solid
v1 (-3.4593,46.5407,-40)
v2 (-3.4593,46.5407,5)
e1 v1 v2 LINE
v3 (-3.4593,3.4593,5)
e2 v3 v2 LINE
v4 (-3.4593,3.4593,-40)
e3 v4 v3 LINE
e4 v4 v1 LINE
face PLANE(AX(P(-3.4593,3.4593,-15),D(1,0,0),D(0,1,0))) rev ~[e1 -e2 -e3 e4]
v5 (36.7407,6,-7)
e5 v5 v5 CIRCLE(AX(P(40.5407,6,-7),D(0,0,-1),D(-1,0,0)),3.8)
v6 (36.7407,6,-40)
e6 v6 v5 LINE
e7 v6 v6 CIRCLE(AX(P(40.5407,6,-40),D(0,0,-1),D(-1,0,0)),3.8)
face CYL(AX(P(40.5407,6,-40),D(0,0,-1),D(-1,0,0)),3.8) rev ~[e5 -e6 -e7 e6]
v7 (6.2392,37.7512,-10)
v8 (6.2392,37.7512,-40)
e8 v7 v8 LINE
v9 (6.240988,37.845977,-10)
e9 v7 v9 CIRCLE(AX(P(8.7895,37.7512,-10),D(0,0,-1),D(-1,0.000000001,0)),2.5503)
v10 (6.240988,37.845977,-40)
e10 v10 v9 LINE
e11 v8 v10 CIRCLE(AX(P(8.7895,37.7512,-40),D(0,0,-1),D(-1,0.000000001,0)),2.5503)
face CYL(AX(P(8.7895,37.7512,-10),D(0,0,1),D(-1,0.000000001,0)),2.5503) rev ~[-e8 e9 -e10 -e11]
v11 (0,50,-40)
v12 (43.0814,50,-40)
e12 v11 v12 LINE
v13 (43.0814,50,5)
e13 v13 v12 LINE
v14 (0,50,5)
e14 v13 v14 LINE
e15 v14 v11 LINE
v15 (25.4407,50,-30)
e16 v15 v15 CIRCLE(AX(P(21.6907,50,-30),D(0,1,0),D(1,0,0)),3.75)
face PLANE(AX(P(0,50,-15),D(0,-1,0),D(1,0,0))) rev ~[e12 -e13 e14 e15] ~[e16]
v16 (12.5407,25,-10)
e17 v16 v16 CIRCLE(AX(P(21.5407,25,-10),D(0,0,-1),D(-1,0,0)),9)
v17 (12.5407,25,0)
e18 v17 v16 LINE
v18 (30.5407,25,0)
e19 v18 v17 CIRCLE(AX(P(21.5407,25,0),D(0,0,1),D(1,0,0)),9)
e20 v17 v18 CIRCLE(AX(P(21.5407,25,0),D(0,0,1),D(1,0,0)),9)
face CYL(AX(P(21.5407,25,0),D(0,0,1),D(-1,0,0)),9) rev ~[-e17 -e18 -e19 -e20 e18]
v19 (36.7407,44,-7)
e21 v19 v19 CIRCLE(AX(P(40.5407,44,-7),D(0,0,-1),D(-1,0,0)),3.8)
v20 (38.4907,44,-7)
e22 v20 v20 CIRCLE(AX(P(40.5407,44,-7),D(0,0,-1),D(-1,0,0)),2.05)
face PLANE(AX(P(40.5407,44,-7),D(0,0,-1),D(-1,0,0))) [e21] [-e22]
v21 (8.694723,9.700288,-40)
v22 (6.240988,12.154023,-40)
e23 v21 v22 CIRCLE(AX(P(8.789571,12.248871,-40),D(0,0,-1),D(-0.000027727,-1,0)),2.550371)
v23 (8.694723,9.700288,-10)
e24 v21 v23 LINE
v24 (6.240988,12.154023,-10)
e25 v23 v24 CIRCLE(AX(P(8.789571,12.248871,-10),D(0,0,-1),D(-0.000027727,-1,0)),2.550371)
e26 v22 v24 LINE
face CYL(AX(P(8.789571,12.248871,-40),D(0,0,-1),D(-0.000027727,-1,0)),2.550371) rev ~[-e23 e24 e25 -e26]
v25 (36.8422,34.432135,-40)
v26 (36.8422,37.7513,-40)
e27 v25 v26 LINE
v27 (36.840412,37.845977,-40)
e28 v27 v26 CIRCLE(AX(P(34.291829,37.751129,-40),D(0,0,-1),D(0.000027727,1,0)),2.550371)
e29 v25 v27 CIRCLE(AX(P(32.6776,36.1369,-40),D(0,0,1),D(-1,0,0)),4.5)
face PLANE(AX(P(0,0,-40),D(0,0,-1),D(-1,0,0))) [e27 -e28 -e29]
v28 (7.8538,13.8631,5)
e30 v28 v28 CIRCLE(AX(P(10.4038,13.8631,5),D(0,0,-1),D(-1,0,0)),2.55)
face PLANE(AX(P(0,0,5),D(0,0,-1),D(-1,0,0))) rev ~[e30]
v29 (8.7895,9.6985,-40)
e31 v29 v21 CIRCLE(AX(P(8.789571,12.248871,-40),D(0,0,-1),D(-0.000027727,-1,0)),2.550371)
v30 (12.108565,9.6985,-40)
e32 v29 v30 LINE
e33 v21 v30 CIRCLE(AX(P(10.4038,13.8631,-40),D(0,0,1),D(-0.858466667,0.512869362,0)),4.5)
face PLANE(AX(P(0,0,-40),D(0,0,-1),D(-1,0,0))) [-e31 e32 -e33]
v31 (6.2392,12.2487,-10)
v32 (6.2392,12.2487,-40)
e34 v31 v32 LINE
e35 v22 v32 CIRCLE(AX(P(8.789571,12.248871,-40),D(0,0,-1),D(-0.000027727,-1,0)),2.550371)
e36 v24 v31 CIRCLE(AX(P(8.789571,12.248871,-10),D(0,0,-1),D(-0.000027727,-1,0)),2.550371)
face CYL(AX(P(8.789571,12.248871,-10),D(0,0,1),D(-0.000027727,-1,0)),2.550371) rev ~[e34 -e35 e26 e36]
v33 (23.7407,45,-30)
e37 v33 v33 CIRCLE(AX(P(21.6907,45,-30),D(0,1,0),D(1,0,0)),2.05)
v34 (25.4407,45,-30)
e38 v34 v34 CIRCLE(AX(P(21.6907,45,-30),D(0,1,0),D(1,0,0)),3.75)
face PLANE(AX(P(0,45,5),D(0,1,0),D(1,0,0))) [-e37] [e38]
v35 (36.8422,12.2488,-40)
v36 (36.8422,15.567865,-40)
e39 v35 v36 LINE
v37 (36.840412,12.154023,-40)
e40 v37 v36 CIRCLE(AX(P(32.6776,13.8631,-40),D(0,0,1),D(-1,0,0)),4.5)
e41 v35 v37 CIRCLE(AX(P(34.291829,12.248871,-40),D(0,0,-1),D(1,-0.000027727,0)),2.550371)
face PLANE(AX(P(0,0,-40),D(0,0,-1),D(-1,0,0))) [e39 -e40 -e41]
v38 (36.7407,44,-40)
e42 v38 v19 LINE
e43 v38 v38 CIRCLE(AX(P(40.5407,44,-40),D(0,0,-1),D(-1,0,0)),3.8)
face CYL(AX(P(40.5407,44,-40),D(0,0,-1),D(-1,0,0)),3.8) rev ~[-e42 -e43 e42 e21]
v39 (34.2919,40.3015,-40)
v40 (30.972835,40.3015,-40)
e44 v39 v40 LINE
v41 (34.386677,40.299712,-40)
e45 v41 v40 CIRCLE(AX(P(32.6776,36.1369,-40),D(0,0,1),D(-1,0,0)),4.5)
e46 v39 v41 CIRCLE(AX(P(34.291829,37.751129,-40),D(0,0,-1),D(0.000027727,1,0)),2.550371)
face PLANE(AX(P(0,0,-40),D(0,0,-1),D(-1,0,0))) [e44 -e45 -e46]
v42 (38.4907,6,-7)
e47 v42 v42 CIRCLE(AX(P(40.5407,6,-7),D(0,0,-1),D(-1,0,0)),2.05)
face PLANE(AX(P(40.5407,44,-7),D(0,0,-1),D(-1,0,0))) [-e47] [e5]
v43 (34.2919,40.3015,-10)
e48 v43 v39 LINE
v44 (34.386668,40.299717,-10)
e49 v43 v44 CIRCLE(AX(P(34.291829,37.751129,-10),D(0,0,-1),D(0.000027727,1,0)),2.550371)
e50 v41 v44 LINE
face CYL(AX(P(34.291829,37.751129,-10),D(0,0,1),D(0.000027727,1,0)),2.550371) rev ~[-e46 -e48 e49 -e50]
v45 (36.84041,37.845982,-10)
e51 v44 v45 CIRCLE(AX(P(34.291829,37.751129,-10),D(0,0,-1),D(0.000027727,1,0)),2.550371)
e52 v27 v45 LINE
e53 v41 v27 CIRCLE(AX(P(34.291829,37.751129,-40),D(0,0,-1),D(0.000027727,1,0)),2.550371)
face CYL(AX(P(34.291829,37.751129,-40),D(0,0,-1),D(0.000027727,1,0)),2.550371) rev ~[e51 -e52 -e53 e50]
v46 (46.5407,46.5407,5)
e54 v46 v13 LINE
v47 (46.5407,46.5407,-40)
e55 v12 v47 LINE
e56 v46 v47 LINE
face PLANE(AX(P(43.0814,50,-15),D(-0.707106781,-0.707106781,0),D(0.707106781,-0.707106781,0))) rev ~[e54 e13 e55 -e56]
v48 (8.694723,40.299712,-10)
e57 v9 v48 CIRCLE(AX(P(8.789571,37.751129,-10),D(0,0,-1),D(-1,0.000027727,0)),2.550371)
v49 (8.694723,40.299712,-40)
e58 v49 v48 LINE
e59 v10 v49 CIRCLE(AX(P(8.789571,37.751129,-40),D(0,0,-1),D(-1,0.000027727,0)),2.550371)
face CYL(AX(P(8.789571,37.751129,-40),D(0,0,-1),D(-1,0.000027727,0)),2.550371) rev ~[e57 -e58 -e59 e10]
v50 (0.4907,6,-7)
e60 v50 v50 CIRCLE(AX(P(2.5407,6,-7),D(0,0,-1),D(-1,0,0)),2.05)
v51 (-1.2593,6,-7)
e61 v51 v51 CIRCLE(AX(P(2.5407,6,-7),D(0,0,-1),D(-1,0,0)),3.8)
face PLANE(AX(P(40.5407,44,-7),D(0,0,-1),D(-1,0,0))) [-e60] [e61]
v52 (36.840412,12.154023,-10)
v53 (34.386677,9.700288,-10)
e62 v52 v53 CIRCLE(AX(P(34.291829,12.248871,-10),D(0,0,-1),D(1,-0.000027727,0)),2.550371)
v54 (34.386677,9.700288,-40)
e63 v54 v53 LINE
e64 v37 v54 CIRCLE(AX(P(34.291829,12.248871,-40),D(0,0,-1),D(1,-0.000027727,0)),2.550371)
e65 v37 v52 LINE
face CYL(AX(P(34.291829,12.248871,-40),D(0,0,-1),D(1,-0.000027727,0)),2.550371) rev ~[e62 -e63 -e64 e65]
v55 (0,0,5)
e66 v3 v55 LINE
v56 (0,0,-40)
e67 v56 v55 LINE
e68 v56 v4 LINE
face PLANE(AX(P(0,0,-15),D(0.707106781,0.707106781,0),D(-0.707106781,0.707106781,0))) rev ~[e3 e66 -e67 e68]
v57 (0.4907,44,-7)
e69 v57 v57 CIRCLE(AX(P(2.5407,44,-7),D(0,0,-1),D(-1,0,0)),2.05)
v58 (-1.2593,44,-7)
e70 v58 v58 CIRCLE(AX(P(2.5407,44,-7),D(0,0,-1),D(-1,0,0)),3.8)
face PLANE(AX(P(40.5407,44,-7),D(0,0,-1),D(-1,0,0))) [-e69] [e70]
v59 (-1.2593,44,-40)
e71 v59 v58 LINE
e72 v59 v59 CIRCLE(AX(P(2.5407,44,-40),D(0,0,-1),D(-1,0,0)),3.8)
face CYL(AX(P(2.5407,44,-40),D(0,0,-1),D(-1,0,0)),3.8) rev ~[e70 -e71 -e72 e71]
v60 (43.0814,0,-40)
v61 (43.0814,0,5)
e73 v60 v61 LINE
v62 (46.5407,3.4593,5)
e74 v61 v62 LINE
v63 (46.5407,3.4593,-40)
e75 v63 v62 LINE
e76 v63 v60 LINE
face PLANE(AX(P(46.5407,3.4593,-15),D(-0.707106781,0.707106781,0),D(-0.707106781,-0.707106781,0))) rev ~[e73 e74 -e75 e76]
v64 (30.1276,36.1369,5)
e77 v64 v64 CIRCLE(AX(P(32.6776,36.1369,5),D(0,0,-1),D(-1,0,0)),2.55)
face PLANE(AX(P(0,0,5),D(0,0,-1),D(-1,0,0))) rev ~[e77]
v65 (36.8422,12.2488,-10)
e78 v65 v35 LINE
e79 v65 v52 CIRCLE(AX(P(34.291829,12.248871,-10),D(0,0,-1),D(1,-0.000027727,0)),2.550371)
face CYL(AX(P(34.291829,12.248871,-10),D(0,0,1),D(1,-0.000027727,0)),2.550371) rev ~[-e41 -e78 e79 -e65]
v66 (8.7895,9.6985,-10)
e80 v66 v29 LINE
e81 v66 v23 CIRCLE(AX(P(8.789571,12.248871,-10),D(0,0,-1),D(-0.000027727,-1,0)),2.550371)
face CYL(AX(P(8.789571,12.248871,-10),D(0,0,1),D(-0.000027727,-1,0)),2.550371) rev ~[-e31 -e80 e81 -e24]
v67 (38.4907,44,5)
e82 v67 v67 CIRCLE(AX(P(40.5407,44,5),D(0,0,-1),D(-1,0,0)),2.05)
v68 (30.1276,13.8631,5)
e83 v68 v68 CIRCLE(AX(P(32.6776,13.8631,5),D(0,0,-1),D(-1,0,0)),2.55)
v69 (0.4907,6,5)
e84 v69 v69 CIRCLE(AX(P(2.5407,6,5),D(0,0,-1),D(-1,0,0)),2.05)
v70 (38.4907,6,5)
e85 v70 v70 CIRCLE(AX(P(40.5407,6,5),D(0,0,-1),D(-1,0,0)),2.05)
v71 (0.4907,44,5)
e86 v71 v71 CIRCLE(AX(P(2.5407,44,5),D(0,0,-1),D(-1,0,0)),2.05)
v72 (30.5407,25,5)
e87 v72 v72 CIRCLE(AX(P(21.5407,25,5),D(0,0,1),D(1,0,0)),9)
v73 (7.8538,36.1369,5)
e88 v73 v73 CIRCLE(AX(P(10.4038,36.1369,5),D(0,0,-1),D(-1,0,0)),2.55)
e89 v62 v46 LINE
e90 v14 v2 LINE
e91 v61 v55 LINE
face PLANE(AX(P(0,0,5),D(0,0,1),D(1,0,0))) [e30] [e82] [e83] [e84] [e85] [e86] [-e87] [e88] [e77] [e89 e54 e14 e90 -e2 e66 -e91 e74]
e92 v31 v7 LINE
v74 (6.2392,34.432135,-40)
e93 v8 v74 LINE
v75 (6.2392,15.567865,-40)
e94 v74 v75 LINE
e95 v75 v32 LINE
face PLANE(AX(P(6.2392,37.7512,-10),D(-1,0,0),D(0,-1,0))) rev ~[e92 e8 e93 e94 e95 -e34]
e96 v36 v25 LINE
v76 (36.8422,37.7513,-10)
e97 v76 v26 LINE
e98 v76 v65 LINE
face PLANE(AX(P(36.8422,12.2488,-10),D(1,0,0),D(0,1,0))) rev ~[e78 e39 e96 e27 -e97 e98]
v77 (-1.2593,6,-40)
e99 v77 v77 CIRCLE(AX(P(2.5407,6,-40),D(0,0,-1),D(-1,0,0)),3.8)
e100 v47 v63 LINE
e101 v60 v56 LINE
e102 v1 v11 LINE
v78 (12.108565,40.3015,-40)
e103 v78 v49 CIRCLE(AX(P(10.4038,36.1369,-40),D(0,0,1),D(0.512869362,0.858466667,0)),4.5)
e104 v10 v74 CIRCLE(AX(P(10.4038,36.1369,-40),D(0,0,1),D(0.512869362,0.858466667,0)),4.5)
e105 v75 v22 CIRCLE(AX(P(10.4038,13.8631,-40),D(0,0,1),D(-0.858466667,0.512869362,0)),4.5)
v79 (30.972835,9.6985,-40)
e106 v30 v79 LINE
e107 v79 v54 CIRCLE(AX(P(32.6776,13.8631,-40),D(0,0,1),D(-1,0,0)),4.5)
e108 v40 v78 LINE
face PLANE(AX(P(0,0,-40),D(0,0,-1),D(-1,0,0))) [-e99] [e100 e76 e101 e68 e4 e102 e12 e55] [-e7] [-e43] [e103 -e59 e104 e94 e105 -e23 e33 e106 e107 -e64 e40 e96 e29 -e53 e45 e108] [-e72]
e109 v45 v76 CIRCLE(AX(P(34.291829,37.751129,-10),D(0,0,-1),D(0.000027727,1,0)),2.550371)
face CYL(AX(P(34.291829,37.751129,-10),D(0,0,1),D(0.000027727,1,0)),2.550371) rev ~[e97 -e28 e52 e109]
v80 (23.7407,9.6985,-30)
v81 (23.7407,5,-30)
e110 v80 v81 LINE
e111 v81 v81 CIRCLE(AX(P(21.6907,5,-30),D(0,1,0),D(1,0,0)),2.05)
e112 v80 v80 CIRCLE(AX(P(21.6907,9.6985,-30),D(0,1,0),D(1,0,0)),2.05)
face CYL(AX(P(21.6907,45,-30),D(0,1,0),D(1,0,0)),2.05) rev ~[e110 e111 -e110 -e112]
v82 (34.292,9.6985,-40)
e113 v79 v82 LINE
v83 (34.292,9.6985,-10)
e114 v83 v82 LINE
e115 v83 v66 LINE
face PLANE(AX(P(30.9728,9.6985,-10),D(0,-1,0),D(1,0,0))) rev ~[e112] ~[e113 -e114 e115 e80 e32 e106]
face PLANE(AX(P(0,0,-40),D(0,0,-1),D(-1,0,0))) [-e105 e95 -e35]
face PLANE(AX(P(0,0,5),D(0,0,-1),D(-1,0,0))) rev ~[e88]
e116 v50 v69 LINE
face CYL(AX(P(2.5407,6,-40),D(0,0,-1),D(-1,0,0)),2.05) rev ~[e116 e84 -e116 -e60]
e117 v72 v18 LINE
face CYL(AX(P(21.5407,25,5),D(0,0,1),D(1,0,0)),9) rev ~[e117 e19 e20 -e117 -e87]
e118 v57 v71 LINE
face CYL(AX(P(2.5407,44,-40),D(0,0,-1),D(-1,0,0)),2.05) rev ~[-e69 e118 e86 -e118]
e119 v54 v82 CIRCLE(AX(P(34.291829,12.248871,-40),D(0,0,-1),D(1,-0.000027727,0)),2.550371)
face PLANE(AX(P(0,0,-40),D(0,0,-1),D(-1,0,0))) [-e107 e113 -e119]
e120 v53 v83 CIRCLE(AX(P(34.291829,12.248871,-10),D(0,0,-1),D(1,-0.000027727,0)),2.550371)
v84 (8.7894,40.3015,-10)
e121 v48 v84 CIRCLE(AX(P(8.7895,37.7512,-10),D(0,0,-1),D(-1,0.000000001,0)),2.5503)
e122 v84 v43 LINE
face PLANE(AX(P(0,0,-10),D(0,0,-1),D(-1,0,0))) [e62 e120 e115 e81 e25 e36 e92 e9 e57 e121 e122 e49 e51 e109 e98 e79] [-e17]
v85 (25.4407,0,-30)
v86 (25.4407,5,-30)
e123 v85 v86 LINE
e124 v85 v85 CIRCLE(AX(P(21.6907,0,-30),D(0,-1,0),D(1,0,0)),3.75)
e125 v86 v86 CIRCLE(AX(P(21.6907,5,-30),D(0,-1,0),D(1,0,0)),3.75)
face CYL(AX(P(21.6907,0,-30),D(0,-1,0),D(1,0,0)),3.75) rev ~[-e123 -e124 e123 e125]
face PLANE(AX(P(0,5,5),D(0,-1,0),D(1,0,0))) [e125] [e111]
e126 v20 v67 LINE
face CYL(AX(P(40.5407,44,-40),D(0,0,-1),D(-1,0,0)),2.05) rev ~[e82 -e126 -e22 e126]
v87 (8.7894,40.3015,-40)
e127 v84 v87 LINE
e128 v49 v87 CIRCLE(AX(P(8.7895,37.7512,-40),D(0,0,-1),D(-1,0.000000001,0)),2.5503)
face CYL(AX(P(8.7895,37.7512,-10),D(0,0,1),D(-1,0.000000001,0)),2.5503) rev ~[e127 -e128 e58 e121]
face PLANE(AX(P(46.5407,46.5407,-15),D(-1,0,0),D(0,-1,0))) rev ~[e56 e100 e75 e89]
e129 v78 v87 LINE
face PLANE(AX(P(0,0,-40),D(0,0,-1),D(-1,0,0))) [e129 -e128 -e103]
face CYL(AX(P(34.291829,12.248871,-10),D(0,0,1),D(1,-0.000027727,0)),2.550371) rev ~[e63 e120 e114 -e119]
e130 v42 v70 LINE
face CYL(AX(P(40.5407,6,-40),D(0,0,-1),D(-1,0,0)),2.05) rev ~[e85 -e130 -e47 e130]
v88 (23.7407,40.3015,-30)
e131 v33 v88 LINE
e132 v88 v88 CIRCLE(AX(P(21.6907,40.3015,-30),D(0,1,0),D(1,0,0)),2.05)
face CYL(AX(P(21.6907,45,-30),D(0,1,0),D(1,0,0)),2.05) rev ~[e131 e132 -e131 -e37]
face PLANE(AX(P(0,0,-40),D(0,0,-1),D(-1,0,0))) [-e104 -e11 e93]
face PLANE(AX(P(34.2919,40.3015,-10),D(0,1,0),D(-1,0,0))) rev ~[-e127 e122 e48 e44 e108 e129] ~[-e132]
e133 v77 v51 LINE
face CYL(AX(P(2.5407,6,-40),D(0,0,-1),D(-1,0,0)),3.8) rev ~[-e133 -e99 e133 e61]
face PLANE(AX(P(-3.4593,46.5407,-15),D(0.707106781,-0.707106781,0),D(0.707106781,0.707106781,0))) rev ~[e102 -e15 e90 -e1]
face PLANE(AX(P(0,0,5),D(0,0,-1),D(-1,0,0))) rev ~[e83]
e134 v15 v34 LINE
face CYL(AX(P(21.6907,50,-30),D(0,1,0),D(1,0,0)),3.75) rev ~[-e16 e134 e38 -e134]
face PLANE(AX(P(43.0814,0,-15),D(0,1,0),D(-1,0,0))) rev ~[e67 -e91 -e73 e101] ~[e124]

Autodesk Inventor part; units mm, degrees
ref_plane "YZ Plane" through (0, 0, 0) normal (1, 0, 0) x (0, 1, 0)
ref_plane "XZ Plane" through (0, 0, 0) normal (0, 1, 0) x (-1, 0, 0)
ref_plane "XY Plane" through (0, 0, 0) normal (0, 0, 1) x (1, 0, 0)
sketch "Sketch11" plane through (0, 0, 0) normal (0, 0, 1) x (1, 0, 0)
  line L0 (-3.4593, 3.4593) -> (0, 0)
  line L1 (-3.4593, 3.4593) -> (-3.4593, 46.5407)
  line L2 (0, 50) -> (-3.4593, 46.5407)
  line L3 (43.0814, 50) -> (0, 50)
  line L4 (46.5407, 46.5407) -> (43.0814, 50)
  line L5 (46.5407, 3.4593) -> (46.5407, 46.5407)
  line L6 (43.0814, 0) -> (46.5407, 3.4593)
  line L7 (43.0814, 0) -> (0, 0)
extrude "Extrusion8" add sketch "Sketch11" along normal blind 5
sketch "Sketch16" plane through (0, 0, 0) normal (0, 0, -1) x (-1, 0, 0)
  line L0 (-27.0407, 40) -> (-34.0407, 40)
  line L1 (-36.5407, 37.5) -> (-36.5407, 30.5)
  arc A0 (-34.0407, 40) -> (-36.5407, 37.5) centre (-34.0407, 37.5) ccw
  line L2 (-9.0407, 40) -> (-16.0407, 40)
  arc A1 (-6.5407, 37.5) -> (-9.0407, 40) centre (-9.0407, 37.5) ccw
  line L3 (-6.5407, 30.5) -> (-6.5407, 37.5)
  line L4 (-6.5407, 12.5) -> (-6.5407, 19.5)
  arc A2 (-9.0407, 10) -> (-6.5407, 12.5) centre (-9.0407, 12.5) ccw
  line L5 (-16.0407, 10) -> (-9.0407, 10)
  line L6 (-34.0407, 10) -> (-27.0407, 10)
  arc A3 (-36.5407, 12.5) -> (-34.0407, 10) centre (-34.0407, 12.5) ccw
  line L7 (-36.5407, 19.5) -> (-36.5407, 12.5)
  line L8 (0, 50) -> (3.4593, 46.5407) projected
  line L9 (-43.0814, 0) -> (-46.5407, 3.4593) projected
  line L10 (-46.5407, 46.5407) -> (-43.0814, 50) projected
  line L11 (-43.0814, 0) -> (-43.0814, 50)
  line L12 (3.4593, 3.4593) -> (0, 0) projected
  line L13 (-6.5407, 30.5) -> (-6.5407, 19.5)
  line L14 (-16.0407, 40) -> (-27.0407, 40)
  line L15 (-36.5407, 30.5) -> (-36.5407, 19.5)
  line L16 (-27.0407, 10) -> (-16.0407, 10)
  circle A4 centre (-2.5407, 44) radius 2.5
  circle A5 centre (-40.5407, 6) radius 2.5
  circle A6 centre (-2.5407, 6) radius 2.5
  circle A7 centre (-40.5407, 44) radius 2.5
  line L17 (0, 50) -> (3.4593, 46.5407)
  line L18 (3.4593, 46.5407) -> (3.4593, 3.4593) projected
  line L19 (0, 0) -> (-43.0814, 0) projected
  line L20 (3.4593, 3.4593) -> (0, 0)
  line L21 (0, 0) -> (-43.0814, 0)
  line L22 (-43.0814, 0) -> (-46.5407, 3.4593) projected
  line L23 (-43.0814, 0) -> (-46.5407, 3.4593)
  line L24 (-46.5407, 3.4593) -> (-46.5407, 46.5407) projected
  line L25 (-46.5407, 3.4593) -> (-46.5407, 46.5407)
  line L26 (-46.5407, 46.5407) -> (-43.0814, 50)
  line L27 (0, 50) -> (-43.0814, 50) projected
  line L28 (0, 50) -> (-43.0814, 50)
  dimension "d44" = 5
  dimension "d45" = 5
  dimension "d46" = 5
  dimension "d47" = 5
extrude "Extrusion11" add sketch "Sketch16" along normal blind 15
sketch "Sketch18" plane through (0, 0, -15) normal (0, 0, -1) x (-1, 0, 0)
  circle A0 centre (-2.5407, 6) radius 2.5 projected
  circle A1 centre (-2.5407, 6) radius 2.5
  circle A2 centre (-40.5407, 6) radius 2.5 projected
  circle A3 centre (-40.5407, 6) radius 2.5
  circle A4 centre (-40.5407, 44) radius 2.5 projected
  circle A5 centre (-40.5407, 44) radius 2.5
  circle A6 centre (-2.5407, 44) radius 2.5 projected
  circle A7 centre (-2.5407, 44) radius 2.5
  point P0 (0, 0)
extrude "Extrusion12" cut sketch "Sketch18" against normal blind 100
sketch "Sketch19" plane through (0, 0, -15) normal (0, 0, -1) x (-1, 0, 0)
  circle A0 centre (-2.5407, 6) radius 2.5 projected
  circle A1 centre (-2.5407, 6) radius 4.3
  circle A2 centre (-40.5407, 6) radius 2.5 projected
  circle A3 centre (-40.5407, 6) radius 4.3
  circle A4 centre (-2.5407, 44) radius 2.5 projected
  circle A5 centre (-2.5407, 44) radius 4.3
  circle A6 centre (-40.5407, 44) radius 2.5 projected
  circle A7 centre (-40.5407, 44) radius 4.3
  point P0 (0, 0)
  dimension "d54" = 8.6
  dimension "d55" = 8.6
  dimension "d56" = 8.6
  dimension "d57" = 8.6
extrude "Extrusion13" cut sketch "Sketch19" against normal blind 10 contours A0 | A1 | A2 | A3 | A5 | A6 | A7
sketch "Sketch20" plane through (0, 0, -15) normal (0, 0, -1) x (-1, 0, 0)
  line L0 (0, 50) -> (-43.0814, 50) projected
  line L1 (-43.0814, 50) -> (-46.5407, 46.5407) projected
  line L2 (-46.5407, 46.5407) -> (-46.5407, 3.4593) projected
  line L3 (-46.5407, 3.4593) -> (-43.0814, 0) projected
  line L4 (-43.0814, 0) -> (0, 0) projected
  line L5 (0, 0) -> (3.4593, 3.4593) projected
  line L6 (3.4593, 3.4593) -> (3.4593, 46.5407) projected
  line L7 (3.4593, 46.5407) -> (0, 50) projected
  circle A0 centre (-2.5407, 44) radius 4.3 projected
  circle A1 centre (-40.5407, 44) radius 4.3 projected
  circle A2 centre (-40.5407, 6) radius 4.3 projected
  circle A3 centre (-2.5407, 6) radius 4.3 projected
  arc A4 (-9.0407, 10) -> (-6.5407, 12.5) centre (-9.0407, 12.5) ccw projected
  line L8 (-9.0407, 10) -> (-34.0407, 10) projected
  line L9 (-36.5407, 12.5) -> (-36.5407, 37.5) projected
  arc A5 (-36.5407, 12.5) -> (-34.0407, 10) centre (-34.0407, 12.5) ccw projected
  line L10 (-6.5407, 37.5) -> (-6.5407, 12.5) projected
  arc A6 (-6.5407, 37.5) -> (-9.0407, 40) centre (-9.0407, 37.5) ccw projected
  line L11 (-34.0407, 40) -> (-9.0407, 40) projected
  arc A7 (-34.0407, 40) -> (-36.5407, 37.5) centre (-34.0407, 37.5) ccw projected
extrude "Extrusion14" add sketch "Sketch20" along normal blind 25
sketch "Sketch21" plane through (0, 50, 5) normal (0, 1, 0) x (1, 0, 0)
  line L0 (-1.7593, 45) -> (6.8407, 45) projected
  circle A0 centre (21.6907, 35) radius 2
  dimension "d63" = 4
extrude "Extrusion15" cut sketch "Sketch21" against normal blind 500
sketch "Sketch22" plane through (0, 50, 5) normal (0, 1, 0) x (1, 0, 0)
  circle A0 centre (21.6907, 35) radius 2 projected
  circle A1 centre (21.6907, 35) radius 3.75
  point P0 (0, 5)
  dimension "d67" = 7.5
extrude "Extrusion16" cut sketch "Sketch22" against normal blind 5 contours A0 | A1
sketch "Sketch23" plane through (0, 0, 5) normal (0, -1, 0) x (1, 0, 0)
  circle A0 centre (21.6907, -35) radius 2 projected
  circle A1 centre (21.6907, -35) radius 3.75
  point P0 (0, -5)
  dimension "d70" = 7.5
extrude "Extrusion17" cut sketch "Sketch23" against normal blind 5
sketch "Sketch25" plane through (2.5407, 44, -5) normal (0, 0, -1) x (-1, 0, 0)
  circle A0 centre (0, 0) radius 2.5 projected
  circle A1 centre (0, -38) radius 2.5 projected
  circle A2 centre (-38, -38) radius 2.5 projected
  circle A3 centre (-38, 0) radius 2.5 projected
  circle A4 centre (0, 0) radius 2
  circle A5 centre (0, -38) radius 2.5 projected
  circle A6 centre (0, -38) radius 2
  circle A7 centre (-38, -38) radius 2
  circle A8 centre (-38, 0) radius 2
  point P0 (2.5407, -44)
  dimension "d75" = 4
  dimension "d76" = 4
  dimension "d77" = 4
  dimension "d78" = 4
extrude "Extrusion18" add sketch "Sketch25" against normal blind 10
sketch "Sketch26" plane through (0, 0, -40) normal (0, 0, -1) x (-1, 0, 0)
  circle A0 centre (-2.5407, 44) radius 4.3 projected
  circle A1 centre (-2.5407, 6) radius 4.3 projected
  circle A2 centre (-40.5407, 6) radius 4.3 projected
  circle A3 centre (-40.5407, 44) radius 4.3 projected
  circle A4 centre (-2.5407, 6) radius 2 projected
  circle A5 centre (-2.5407, 6) radius 3.8
  circle A6 centre (-40.5407, 6) radius 4.3 projected
  circle A7 centre (-40.5407, 6) radius 3.8
  circle A8 centre (-2.5407, 44) radius 2 projected
  circle A9 centre (-2.5407, 44) radius 3.8
  circle A10 centre (-40.5407, 44) radius 2 projected
  circle A11 centre (-40.5407, 44) radius 3.8
  point P0 (0, 0)
  dimension "d81" = 7.6
  dimension "d82" = 7.6
  dimension "d83" = 7.6
  dimension "d84" = 7.6
extrude "Extrusion19" add sketch "Sketch26" against normal blind 35 contours A0 | A1 | A2 | A3
sketch "Sketch27" plane through (0, 0, 5) normal (0, 0, 1) x (1, 0, 0)
  circle A0 centre (2.5407, 44) radius 2 projected
  circle A1 centre (40.5407, 44) radius 2 projected
  circle A2 centre (2.5407, 6) radius 2 projected
  circle A3 centre (40.5407, 6) radius 2 projected
  circle A4 centre (21.5407, 25) radius 9
  point P0 (0, 0)
  dimension "d88" = 18
extrude "Extrusion20" cut sketch "Sketch27" against normal blind 35 contours A4
sketch "Sketch32" plane through (0, 0, -40) normal (0, 0, -1) x (-1, 0, 0)
  circle A0 centre (-21.5407, 25) radius 9 projected
  circle A1 centre (-2.5407, 6) radius 2 projected
  circle A2 centre (-40.5407, 44) radius 2 projected
  circle A3 centre (-2.5407, 44) radius 2 projected
  circle A4 centre (-40.5407, 6) radius 2 projected
  circle A5 centre (-10.4038, 13.8631) radius 2.5
  circle A6 centre (-32.6776, 13.8631) radius 2.5
  circle A7 centre (-10.4038, 36.1369) radius 2.5
  circle A8 centre (-32.6776, 36.1369) radius 2.5
  point P0 (0, 0)
  dimension "d93" = 5
  dimension "d94" = 5
  dimension "d95" = 5
  dimension "d96" = 5
extrude "Extrusion21" cut sketch "Sketch32" against normal blind 100 contours A5 | A6 | A7 | A8
sketch "Sketch33" plane through (0, 0, 0) normal (0, 0, -1) x (-1, 0, 0)
  circle A0 centre (-10.4038, 13.8631) radius 2.5 projected
  circle A1 centre (-10.4038, 13.8631) radius 4.5
  circle A2 centre (-10.4038, 36.1369) radius 2.5 projected
  circle A3 centre (-10.4038, 36.1369) radius 4.5
  circle A4 centre (-32.6776, 36.1369) radius 2.5 projected
  circle A5 centre (-32.6776, 36.1369) radius 4.5
  circle A6 centre (-32.6776, 13.8631) radius 2.5 projected
  circle A7 centre (-32.6776, 13.8631) radius 4.5
  point P0 (0, 0)
  dimension "d99" = 9
  dimension "d100" = 9
  dimension "d101" = 9
  dimension "d102" = 9
extrude "Extrusion22" cut sketch "Sketch33" along normal blind 100 and the other way blind 5
sketch "Sketch34" plane through (0, 0, 5) normal (0, 0, 1) x (1, 0, 0)
  circle A0 centre (10.4038, 36.1369) radius 4.5 projected
  circle A1 centre (10.4038, 36.1369) radius 2.5
  arc A2 (30.3697, 40) -> (36.5407, 33.829) centre (32.6776, 36.1369) ccw projected
  circle A3 centre (32.6776, 36.1369) radius 2.5
  circle A4 centre (10.4038, 13.8631) radius 4.5 projected
  circle A5 centre (10.4038, 13.8631) radius 2.5
  circle A6 centre (32.6776, 13.8631) radius 4.5 projected
  circle A7 centre (32.6776, 13.8631) radius 2.5
  circle A8 centre (32.6776, 36.1369) radius 4.5 projected
  point P0 (0, 0)
  dimension "d107" = 5
  dimension "d108" = 5
  dimension "d109" = 5
  dimension "d110" = 5
extrude "Extrusion23" add sketch "Sketch34" against normal blind 5
sketch "Sketch35" plane through (0, 0, 0) normal (0, 0, -1) x (-1, 0, 0)
  circle A0 centre (-32.6776, 13.8631) radius 2.5 projected
  circle A1 centre (-32.6776, 36.1369) radius 2.5 projected
  circle A2 centre (-10.4038, 13.8631) radius 2.5 projected
  circle A3 centre (-10.4038, 36.1369) radius 2.5 projected
  line L0 (-30.3697, 10) -> (-12.7117, 10) projected
  arc A4 (-12.7117, 10) -> (-6.5407, 16.171) centre (-10.4038, 13.8631) ccw projected
  line L1 (-6.5407, 16.171) -> (-6.5407, 33.829) projected
  arc A5 (-6.5407, 33.829) -> (-12.7117, 40) centre (-10.4038, 36.1369) ccw projected
  line L2 (-12.7117, 40) -> (-30.3697, 40) projected
  arc A6 (-30.3697, 40) -> (-36.5407, 33.829) centre (-32.6776, 36.1369) ccw projected
  line L3 (-36.5407, 33.829) -> (-36.5407, 16.171) projected
  arc A7 (-36.5407, 16.171) -> (-30.3697, 10) centre (-32.6776, 13.8631) ccw projected
  circle A8 centre (-21.5407, 25) radius 9 projected
  circle A9 centre (-32.6776, 36.1369) radius 4.5
  circle A10 centre (-10.4038, 36.1369) radius 2.5 projected
  circle A11 centre (-10.4038, 36.1369) radius 4.5
  circle A12 centre (-32.6776, 13.8631) radius 4.5
  circle A13 centre (-10.4038, 13.8631) radius 2.5 projected
  arc A14 (-12.7117, 10) -> (-6.5407, 16.171) centre (-10.4038, 13.8631) ccw projected
  circle A15 centre (-10.4038, 13.8631) radius 4.5
  point P0 (0, 0)
  point P1 (-12.7117, 40)
extrude "Extrusion24" add sketch "Sketch35" along normal blind 10 contours A12 L3 A9 L2 A11 L1 A15 L0
sketch "Sketch37" plane through (40.5407, 44, -5) normal (0, 0, -1) x (-1, 0, 0)
  circle A0 centre (0, 0) radius 3.8 projected
  circle A1 centre (0, 0) radius 2 projected
  circle A2 centre (38, 0) radius 3.8 projected
  circle A3 centre (38, 0) radius 2 projected
  circle A4 centre (38, -38) radius 3.8 projected
  circle A5 centre (38, -38) radius 2 projected
  circle A6 centre (0, -38) radius 3.8 projected
  circle A7 centre (0, -38) radius 2 projected
  point P0 (40.5407, -44)
extrude "Extrusion25" add sketch "Sketch37" along normal blind 2
sketch "Sketch38" plane through (0, 0, -40) normal (0, 0, -1) x (-1, 0, 0)
  line L0 (-6.5407, 33.829) -> (-6.5407, 16.171) projected
  arc A0 (-12.7117, 40) -> (-6.5407, 33.829) centre (-10.4038, 36.1369) ccw projected
  line L1 (-30.3697, 40) -> (-12.7117, 40) projected
  arc A1 (-36.5407, 33.829) -> (-30.3697, 40) centre (-32.6776, 36.1369) ccw projected
  line L2 (-36.5407, 16.171) -> (-36.5407, 33.829) projected
  arc A2 (-30.3697, 10) -> (-36.5407, 16.171) centre (-32.6776, 13.8631) ccw projected
  line L3 (-12.7117, 10) -> (-30.3697, 10) projected
  arc A3 (-6.5407, 16.171) -> (-12.7117, 10) centre (-10.4038, 13.8631) ccw projected
  circle A4 centre (-21.5407, 25) radius 9 projected
  arc A5 (-30.3697, 40) -> (-36.5407, 33.829) centre (-32.6776, 36.1369) ccw projected
  arc A6 (-36.5407, 16.171) -> (-30.3697, 10) centre (-32.6776, 13.8631) ccw projected
  arc A7 (-6.5407, 33.829) -> (-12.7117, 40) centre (-10.4038, 36.1369) ccw projected
  line L4 (-36.5407, 16.171) -> (-36.5407, 33.829) projected
  arc A8 (-12.7117, 10) -> (-6.5407, 16.171) centre (-10.4038, 13.8631) ccw projected
  line L5 (-21.5407, 25) -> (-36.7907, 25)
  line L6 (-36.7907, 25) -> (-36.7907, 9.75)
  line L7 (-21.5407, 25) -> (-6.2907, 25)
  line L8 (-6.2907, 25) -> (-6.2907, 40.25)
  line L9 (-36.7907, 9.75) -> (-6.2907, 9.75)
  line L10 (-6.2907, 9.75) -> (-6.2907, 40.25)
  line L11 (-6.2907, 40.25) -> (-36.7907, 40.25)
  line L12 (-36.7907, 40.25) -> (-36.7907, 9.75)
  point P0 (0, 0)
  point P1 (-6.2907, 15.6886)
  point P2 (-6.2907, 34.3114)
  point P3 (-30.8521, 9.75)
  point P4 (-12.2293, 9.75)
  point P5 (-36.7907, 34.3114)
  point P6 (-36.7907, 15.6886)
  point P7 (-12.2293, 40.25)
  point P8 (-30.8521, 40.25)
  dimension "d122" = 15.25
  dimension "d123" = 15.25
  dimension "d124" = 15.25
  dimension "d125" = 15.25
extrude "Extrusion26" cut sketch "Sketch38" against normal blind 30 contours A7 L8 L7 L0 | L7 L10 A8 L0 | L1 A5 L11 A7 | A8 L9 A6 L3 | L2 L5 L12 A5 | L2 A6 L6 L5
sketch "Sketch40" plane through (0, 0, -40) normal (0, 0, -1) x (-1, 0, 0)
  line L0 (3.4593, 3.4593) -> (3.4593, 46.5407) projected
  line L1 (-12.2293, 9.75) -> (-30.8521, 9.75) projected
  arc A0 (-36.7907, 15.6886) -> (-30.8521, 9.75) centre (-32.6776, 13.8631) ccw projected
  line L2 (-36.7907, 15.6886) -> (-36.7907, 34.3114) projected
  arc A1 (-30.8521, 40.25) -> (-36.7907, 34.3114) centre (-32.6776, 36.1369) ccw projected
  line L3 (-30.8521, 40.25) -> (-12.2293, 40.25) projected
  arc A2 (-6.2907, 34.3114) -> (-12.2293, 40.25) centre (-10.4038, 36.1369) ccw projected
  line L4 (-6.2907, 34.3114) -> (-6.2907, 15.6886) projected
  arc A3 (-12.2293, 9.75) -> (-6.2907, 15.6886) centre (-10.4038, 13.8631) ccw projected
  circle A4 centre (-40.5407, 44) radius 3.8 projected
  circle A5 centre (-40.5407, 6) radius 3.8 projected
  circle A6 centre (-2.5407, 44) radius 3.8 projected
  circle A7 centre (-2.5407, 6) radius 3.8 projected
  line L5 (-43.0814, 50) -> (-46.5407, 46.5407) projected
  line L6 (-46.5407, 46.5407) -> (-46.5407, 3.4593) projected
  line L7 (-46.5407, 3.4593) -> (-43.0814, 0) projected
  line L8 (-43.0814, 0) -> (0, 0) projected
  line L9 (0, 0) -> (3.4593, 3.4593) projected
  line L10 (3.4593, 3.4593) -> (3.4593, 46.5407) projected
  line L11 (3.4593, 46.5407) -> (0, 50) projected
  line L12 (0, 50) -> (-43.0814, 50) projected
  line L13 (-6.4407, 38.2686) -> (-6.4407, 53.3686)
  line L14 (-8.2721, 40.1) -> (-36.6407, 40.1)
  line L15 (-36.6407, 40.1) -> (-36.6407, 9.9)
  line L16 (-36.6407, 9.9) -> (-6.4407, 9.9)
  line L17 (-6.4407, 9.9) -> (-6.4407, 53.3686)
  arc A8 (-12.2293, 40.25) -> (-6.2907, 34.3114) centre (-10.4038, 36.1369) ccw projected
  line L18 (-30.8521, 40.25) -> (-12.2293, 40.25) projected
  arc A9 (-36.7907, 34.3114) -> (-30.8521, 40.25) centre (-32.6776, 36.1369) ccw projected
  line L19 (-36.7907, 15.6886) -> (-36.7907, 34.3114) projected
  arc A10 (-30.8521, 9.75) -> (-36.7907, 15.6886) centre (-32.6776, 13.8631) ccw projected
  line L20 (-12.2293, 9.75) -> (-30.8521, 9.75) projected
  arc A11 (-6.2907, 15.6886) -> (-12.2293, 9.75) centre (-10.4038, 13.8631) ccw projected
  line L21 (-6.2907, 34.3114) -> (-6.2907, 15.6886) projected
  circle A12 centre (-21.5407, 25) radius 9 projected
  point P0 (-30.5459, 40.1)
  point P1 (-12.5355, 40.1)
  point P2 (-6.4407, 15.9948)
  point P3 (-6.2907, 34.3114)
  point P4 (-6.4407, 34.0052)
  point P5 (-36.6407, 15.9948)
  point P6 (-36.6407, 34.0052)
  point P7 (-12.5355, 9.9)
  point P8 (-30.5459, 9.9)
  dimension "d133" = 15.1
  dimension "d134" = 30.2
  dimension "d135" = 30.2
extrude "Extrusion27" add sketch "Sketch40" against normal blind 30 contours L1 A10 L16 A11 | L17 A8 L4 A11 | A10 L2 A9 L15 | L14 A9 L3 A8
sketch "Sketch42" plane through (21.6907, 45, -30) normal (0, 1, 0) x (1, 0, 0)
  circle A0 centre (0, 0) radius 2 projected
  circle A1 centre (0, 0) radius 2.05
  point P0 (-21.6907, -30)
  dimension "d138" = 4.1
extrude "Extrusion28" cut sketch "Sketch42" against normal blind 100 contours A0 | A1
sketch "Sketch43" plane through (0, 0, -40) normal (0, 0, -1) x (-1, 0, 0)
  circle A0 centre (-2.5407, 6) radius 2 projected
  circle A1 centre (-2.5407, 6) radius 2.05
  circle A2 centre (-40.5407, 6) radius 2 projected
  circle A3 centre (-40.5407, 6) radius 2.05
  circle A4 centre (-40.5407, 44) radius 2 projected
  circle A5 centre (-40.5407, 44) radius 2.05
  circle A6 centre (-2.5407, 44) radius 2 projected
  circle A7 centre (-2.5407, 44) radius 2.05
  circle A8 centre (-10.4038, 36.1369) radius 2.5 projected
  circle A9 centre (-10.4038, 36.1369) radius 2.55
  circle A10 centre (-32.6776, 36.1369) radius 2.5 projected
  circle A11 centre (-32.6776, 36.1369) radius 2.55
  circle A12 centre (-32.6776, 13.8631) radius 4.5 projected
  circle A13 centre (-32.6776, 13.8631) radius 2.55
  circle A14 centre (-10.4038, 13.8631) radius 2.5 projected
  circle A15 centre (-10.4038, 13.8631) radius 2.55
  point P0 (0, 0)
  dimension "d141" = 4.1
  dimension "d142" = 4.1
  dimension "d143" = 4.1
  dimension "d144" = 4.1
  dimension "d145" = 5.1
  dimension "d146" = 5.1
  dimension "d147" = 5.1
  dimension "d148" = 5.1
extrude "Extrusion29" cut sketch "Sketch43" against normal blind 100 contours A0 | A1 | A2 | A3 | A4 | A5 | A6 | A7 | A8 | A9 | A10 | A11 | A13 | A14 | A15
sketch "Sketch44" plane through (0, 0, -40) normal (0, 0, -1) x (-1, 0, 0)
  arc A0 (-34.2919, 40.3015) -> (-36.8422, 37.7513) centre (-34.2919, 37.7513) ccw
  line L0 (-34.2919, 40.3015) -> (-8.7894, 40.3015)
  arc A1 (-6.2392, 37.7512) -> (-8.7894, 40.3015) centre (-8.7894, 37.7512) ccw
  line L1 (-6.2392, 37.7512) -> (-6.2392, 12.2487)
  arc A2 (-8.7895, 9.6985) -> (-6.2392, 12.2487) centre (-8.7895, 12.2487) ccw
  line L2 (-8.7895, 9.6985) -> (-34.292, 9.6985)
  arc A3 (-36.8422, 12.2488) -> (-34.292, 9.6985) centre (-34.292, 12.2488) ccw
  line L3 (-36.8422, 12.2488) -> (-36.8422, 37.7513)
  circle A4 centre (-21.5407, 25) radius 1
  circle A5 centre (-21.5407, 25) radius 9 projected
  point P0 (0, 0)
  dimension "d151" = 2
extrude "Extrusion30" cut sketch "Sketch44" against normal blind 30 contours L0 A1 L1 A2 L2 A3 L3 A0 | A4 | A5
sketch "Sketch47" plane through (0, 0, -10) normal (0, 0, -1) x (-1, 0, 0)
  circle A0 centre (-10.4038, 13.8631) radius 2.55 projected
  circle A1 centre (-10.4038, 13.8631) radius 4.5
  circle A2 centre (-10.4038, 36.1369) radius 2.55 projected
  circle A3 centre (-10.4038, 36.1369) radius 4.5
  circle A4 centre (-32.6776, 36.1369) radius 2.55 projected
  arc A5 (-36.8404, 37.846) -> (-36.8422, 34.4321) centre (-32.6776, 36.1369) ccw projected
  circle A6 centre (-32.6776, 36.1369) radius 4.5
  circle A7 centre (-32.6776, 13.8631) radius 2.55 projected
  line L0 (-36.8422, 15.5679) -> (-36.8422, 34.4321) projected
  circle A8 centre (-32.6776, 13.8631) radius 4.5
  point P0 (0, 0)
extrude "Extrusion32" add sketch "Sketch47" against normal blind 10
sketch "Sketch48" plane through (0, 0, -10) normal (0, 0, -1) x (-1, 0, 0)
  circle A0 centre (-32.6776, 13.8631) radius 2.55 projected
  circle A1 centre (-32.6776, 13.8631) radius 2.55
  circle A2 centre (-32.6776, 36.1369) radius 2.55 projected
  circle A3 centre (-32.6776, 36.1369) radius 2.55
  circle A4 centre (-10.4038, 36.1369) radius 2.55 projected
  circle A5 centre (-10.4038, 36.1369) radius 2.55
  circle A6 centre (-10.4038, 13.8631) radius 2.55 projected
  circle A7 centre (-10.4038, 13.8631) radius 2.55
  point P0 (0, 0)
extrude "Extrusion33" add sketch "Sketch48" against normal blind 15
sketch "Sketch49" plane through (0, 0, -10) normal (0, 0, -1) x (-1, 0, 0)
  circle A0 centre (-21.5407, 25) radius 9 projected
  arc A1 (-8.6947, 9.7003) -> (-6.241, 12.154) centre (-8.7895, 12.2487) ccw projected
  arc A2 (-6.241, 12.154) -> (-6.2392, 15.5679) centre (-10.4038, 13.8631) ccw projected
  line L0 (-6.2392, 34.4321) -> (-6.2392, 15.5679) projected
  arc A3 (-6.2392, 34.4321) -> (-6.241, 37.846) centre (-10.4038, 36.1369) ccw projected
  arc A4 (-6.241, 37.846) -> (-8.6947, 40.2997) centre (-8.7894, 37.7512) ccw projected
  arc A5 (-8.6947, 40.2997) -> (-12.1086, 40.3015) centre (-10.4038, 36.1369) ccw projected
  line L1 (-30.9728, 40.3015) -> (-12.1086, 40.3015) projected
  arc A6 (-30.9728, 40.3015) -> (-34.3867, 40.2997) centre (-32.6776, 36.1369) ccw projected
  arc A7 (-34.3867, 40.2997) -> (-36.8404, 37.846) centre (-34.2919, 37.7513) ccw projected
  arc A8 (-36.8404, 37.846) -> (-36.8422, 34.4321) centre (-32.6776, 36.1369) ccw projected
  line L2 (-36.8422, 15.5679) -> (-36.8422, 34.4321) projected
  arc A9 (-36.8422, 15.5679) -> (-36.8404, 12.154) centre (-32.6776, 13.8631) ccw projected
  arc A10 (-36.8404, 12.154) -> (-34.3867, 9.7003) centre (-34.292, 12.2488) ccw projected
  arc A11 (-34.3867, 9.7003) -> (-30.9728, 9.6985) centre (-32.6776, 13.8631) ccw projected
  line L3 (-12.1086, 9.6985) -> (-30.9728, 9.6985) projected
  arc A12 (-12.1086, 9.6985) -> (-8.6947, 9.7003) centre (-10.4038, 13.8631) ccw projected
  line L4 (-34.2919, 40.3015) -> (-8.7894, 40.3015)
  arc A13 (-34.2919, 40.3015) -> (-36.8422, 37.7513) centre (-34.2919, 37.7513) ccw
  line L5 (-36.8422, 12.2488) -> (-36.8422, 37.7513)
  arc A14 (-36.8422, 12.2488) -> (-34.292, 9.6985) centre (-34.292, 12.2488) ccw
  line L6 (-8.7895, 9.6985) -> (-34.292, 9.6985)
  arc A15 (-8.7895, 9.6985) -> (-6.2392, 12.2487) centre (-8.7895, 12.2487) ccw
  line L7 (-6.2392, 37.7512) -> (-6.2392, 12.2487)
  arc A16 (-6.2392, 37.7512) -> (-8.7894, 40.3015) centre (-8.7895, 37.7512) ccw
  circle A17 centre (-21.5407, 25) radius 9
  point P0 (0, 0)
  point P1 (0, 0)
  point P2 (-6.241, 37.846)
  point P3 (-34.3867, 40.2997)
  point P4 (-36.8404, 37.846)
  point P5 (-34.3867, 9.7003)
  point P6 (-36.8404, 12.154)
extrude "Extrusion34" add sketch "Sketch49" along normal blind 30 contours A12 L6 A15 | A15 L7 A2 | A11 A14 L6 | L7 A16 A3 | A9 L5 A14 | A16 L4 A5 | A8 A13 L5 | L4 A13 A6
properties part number "Part1_b"
